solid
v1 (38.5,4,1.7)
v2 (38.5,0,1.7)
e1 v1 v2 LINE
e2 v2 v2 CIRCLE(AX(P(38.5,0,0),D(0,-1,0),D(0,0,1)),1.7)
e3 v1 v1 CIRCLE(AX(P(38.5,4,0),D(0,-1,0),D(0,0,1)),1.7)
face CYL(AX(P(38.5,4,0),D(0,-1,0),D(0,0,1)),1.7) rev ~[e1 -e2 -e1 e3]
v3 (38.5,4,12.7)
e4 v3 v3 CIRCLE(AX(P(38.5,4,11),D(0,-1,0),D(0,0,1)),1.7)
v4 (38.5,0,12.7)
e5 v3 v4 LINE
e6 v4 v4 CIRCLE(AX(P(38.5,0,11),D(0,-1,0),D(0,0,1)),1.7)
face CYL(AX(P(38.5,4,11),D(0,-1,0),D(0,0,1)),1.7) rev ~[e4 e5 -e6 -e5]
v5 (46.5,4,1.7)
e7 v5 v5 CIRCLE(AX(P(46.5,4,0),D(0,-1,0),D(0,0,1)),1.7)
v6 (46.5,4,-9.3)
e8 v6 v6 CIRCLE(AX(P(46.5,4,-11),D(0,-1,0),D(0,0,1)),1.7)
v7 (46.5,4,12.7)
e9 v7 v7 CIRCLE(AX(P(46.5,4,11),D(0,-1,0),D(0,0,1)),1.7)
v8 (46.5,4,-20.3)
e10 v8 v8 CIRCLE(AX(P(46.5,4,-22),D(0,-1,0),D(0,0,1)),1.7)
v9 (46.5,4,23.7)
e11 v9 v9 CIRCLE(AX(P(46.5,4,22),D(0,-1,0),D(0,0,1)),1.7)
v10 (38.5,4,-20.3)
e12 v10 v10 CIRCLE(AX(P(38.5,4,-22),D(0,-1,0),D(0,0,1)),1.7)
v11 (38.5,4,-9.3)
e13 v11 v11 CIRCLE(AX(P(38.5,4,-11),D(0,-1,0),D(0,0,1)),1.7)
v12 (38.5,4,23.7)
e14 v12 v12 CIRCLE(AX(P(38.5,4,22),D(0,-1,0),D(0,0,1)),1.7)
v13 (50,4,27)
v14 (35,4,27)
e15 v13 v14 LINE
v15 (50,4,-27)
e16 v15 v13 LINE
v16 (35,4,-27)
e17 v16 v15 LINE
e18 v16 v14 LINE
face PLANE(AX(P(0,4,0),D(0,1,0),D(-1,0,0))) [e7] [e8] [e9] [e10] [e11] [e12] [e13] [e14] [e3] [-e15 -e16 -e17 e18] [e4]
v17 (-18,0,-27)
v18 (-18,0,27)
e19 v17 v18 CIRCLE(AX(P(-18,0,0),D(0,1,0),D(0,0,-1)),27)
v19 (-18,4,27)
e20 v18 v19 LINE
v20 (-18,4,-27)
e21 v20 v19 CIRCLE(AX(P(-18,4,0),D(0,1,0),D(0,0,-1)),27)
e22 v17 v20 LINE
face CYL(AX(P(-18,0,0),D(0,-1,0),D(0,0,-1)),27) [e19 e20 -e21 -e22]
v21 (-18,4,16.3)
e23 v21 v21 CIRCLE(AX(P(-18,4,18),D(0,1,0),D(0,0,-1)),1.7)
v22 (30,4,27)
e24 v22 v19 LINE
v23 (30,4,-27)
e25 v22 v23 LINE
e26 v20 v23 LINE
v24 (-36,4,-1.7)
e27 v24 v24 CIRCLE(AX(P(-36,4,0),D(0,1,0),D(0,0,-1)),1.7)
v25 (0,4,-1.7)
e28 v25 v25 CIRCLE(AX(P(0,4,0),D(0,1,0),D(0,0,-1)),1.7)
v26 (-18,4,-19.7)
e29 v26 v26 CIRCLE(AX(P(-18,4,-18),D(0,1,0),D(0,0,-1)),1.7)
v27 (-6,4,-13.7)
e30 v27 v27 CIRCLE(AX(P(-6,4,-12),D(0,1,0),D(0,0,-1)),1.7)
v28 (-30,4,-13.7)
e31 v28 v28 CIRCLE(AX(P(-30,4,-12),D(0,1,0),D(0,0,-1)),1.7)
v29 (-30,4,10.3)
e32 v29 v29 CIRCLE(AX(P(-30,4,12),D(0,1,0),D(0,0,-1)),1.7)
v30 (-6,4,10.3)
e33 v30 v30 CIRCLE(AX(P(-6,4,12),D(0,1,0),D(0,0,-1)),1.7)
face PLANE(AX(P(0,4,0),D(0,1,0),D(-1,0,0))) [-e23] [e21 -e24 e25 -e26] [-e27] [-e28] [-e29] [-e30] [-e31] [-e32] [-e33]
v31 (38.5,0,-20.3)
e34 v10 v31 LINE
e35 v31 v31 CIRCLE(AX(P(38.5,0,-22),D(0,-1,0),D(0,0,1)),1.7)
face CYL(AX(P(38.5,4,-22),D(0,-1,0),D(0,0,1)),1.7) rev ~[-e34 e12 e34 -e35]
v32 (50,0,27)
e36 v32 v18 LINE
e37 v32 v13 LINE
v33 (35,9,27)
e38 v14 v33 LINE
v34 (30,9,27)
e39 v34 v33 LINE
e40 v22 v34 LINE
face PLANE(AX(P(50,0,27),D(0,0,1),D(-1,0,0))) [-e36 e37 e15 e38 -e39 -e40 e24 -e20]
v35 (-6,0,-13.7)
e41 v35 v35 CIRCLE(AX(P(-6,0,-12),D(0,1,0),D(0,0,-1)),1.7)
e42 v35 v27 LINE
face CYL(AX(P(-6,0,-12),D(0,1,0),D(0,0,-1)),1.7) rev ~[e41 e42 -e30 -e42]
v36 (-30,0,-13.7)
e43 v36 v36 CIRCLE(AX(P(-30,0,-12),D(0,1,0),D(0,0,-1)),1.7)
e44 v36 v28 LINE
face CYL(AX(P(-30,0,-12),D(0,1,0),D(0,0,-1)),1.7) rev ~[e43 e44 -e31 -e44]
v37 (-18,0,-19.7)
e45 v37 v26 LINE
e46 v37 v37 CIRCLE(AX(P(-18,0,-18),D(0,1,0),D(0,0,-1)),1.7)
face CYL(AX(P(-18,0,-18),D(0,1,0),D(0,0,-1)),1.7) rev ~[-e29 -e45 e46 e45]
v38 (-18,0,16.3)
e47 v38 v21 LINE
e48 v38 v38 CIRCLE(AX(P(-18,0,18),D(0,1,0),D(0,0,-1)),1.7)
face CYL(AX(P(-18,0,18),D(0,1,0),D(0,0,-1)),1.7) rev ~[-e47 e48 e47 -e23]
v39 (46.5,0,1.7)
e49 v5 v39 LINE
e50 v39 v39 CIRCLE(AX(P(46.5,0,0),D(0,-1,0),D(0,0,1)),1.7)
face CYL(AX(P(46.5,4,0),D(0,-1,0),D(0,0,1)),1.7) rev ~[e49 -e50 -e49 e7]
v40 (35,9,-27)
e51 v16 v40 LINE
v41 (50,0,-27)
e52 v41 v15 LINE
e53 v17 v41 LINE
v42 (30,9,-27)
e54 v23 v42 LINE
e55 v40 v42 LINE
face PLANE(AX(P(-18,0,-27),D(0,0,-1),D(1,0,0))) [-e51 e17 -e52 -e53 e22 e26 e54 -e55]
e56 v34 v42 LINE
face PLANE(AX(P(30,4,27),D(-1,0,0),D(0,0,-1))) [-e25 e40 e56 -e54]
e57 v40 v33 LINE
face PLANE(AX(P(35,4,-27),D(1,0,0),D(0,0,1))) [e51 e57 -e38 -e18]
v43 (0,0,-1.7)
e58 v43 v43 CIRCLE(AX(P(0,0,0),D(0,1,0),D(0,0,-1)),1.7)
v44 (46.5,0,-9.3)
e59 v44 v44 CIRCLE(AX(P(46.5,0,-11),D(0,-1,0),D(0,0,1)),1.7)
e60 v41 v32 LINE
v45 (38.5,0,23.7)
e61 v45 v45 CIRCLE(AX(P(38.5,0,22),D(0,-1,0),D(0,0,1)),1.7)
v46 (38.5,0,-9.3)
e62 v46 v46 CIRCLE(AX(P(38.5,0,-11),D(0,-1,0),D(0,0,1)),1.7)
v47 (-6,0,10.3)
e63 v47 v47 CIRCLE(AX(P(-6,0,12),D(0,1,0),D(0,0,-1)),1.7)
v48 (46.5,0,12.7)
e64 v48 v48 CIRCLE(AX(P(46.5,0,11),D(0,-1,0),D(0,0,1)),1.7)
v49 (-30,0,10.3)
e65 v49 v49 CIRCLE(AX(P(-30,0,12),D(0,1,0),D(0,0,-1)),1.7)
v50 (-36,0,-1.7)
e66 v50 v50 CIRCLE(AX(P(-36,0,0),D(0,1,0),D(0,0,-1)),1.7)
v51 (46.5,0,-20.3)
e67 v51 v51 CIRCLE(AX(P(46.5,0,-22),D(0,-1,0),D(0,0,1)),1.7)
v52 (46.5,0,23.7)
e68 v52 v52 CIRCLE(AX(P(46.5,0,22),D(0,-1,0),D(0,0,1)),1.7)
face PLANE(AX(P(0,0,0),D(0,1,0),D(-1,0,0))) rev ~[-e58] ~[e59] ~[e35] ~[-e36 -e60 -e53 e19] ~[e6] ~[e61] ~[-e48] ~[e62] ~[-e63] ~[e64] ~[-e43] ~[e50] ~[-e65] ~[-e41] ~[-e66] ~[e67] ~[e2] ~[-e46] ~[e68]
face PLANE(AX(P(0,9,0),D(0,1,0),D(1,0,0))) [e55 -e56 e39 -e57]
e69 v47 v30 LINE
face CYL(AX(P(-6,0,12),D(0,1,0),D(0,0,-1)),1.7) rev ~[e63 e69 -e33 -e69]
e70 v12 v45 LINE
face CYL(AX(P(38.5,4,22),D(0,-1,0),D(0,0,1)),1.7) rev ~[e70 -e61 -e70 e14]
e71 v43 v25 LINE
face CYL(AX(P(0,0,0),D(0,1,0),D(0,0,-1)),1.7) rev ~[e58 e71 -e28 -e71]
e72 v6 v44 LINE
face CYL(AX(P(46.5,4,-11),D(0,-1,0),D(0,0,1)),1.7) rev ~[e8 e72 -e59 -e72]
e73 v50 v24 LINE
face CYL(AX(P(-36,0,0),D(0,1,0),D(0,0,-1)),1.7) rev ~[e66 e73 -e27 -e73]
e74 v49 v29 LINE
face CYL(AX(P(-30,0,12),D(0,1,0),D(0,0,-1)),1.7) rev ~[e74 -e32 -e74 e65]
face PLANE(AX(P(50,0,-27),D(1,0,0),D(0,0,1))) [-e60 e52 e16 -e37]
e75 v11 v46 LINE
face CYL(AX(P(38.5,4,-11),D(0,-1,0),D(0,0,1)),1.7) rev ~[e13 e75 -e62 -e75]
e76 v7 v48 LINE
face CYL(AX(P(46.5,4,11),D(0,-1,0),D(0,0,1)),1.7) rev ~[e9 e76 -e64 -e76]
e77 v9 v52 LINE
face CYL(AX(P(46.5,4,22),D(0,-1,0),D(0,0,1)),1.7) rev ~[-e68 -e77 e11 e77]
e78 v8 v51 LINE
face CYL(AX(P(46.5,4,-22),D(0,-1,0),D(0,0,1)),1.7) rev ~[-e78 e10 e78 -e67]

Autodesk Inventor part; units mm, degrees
ref_plane "YZ Plane" through (0, 0, 0) normal (1, 0, 0) x (0, 1, 0)
ref_plane "XZ Plane" through (0, 0, 0) normal (0, 1, 0) x (-1, 0, 0)
ref_plane "XY Plane" through (0, 0, 0) normal (0, 0, 1) x (1, 0, 0)
sketch "Skizze1" plane through (0, 0, 0) normal (0, 1, 0) x (-1, 0, 0)
  line L0 (-50, 27) -> (50, 27)
  line L1 (50, 27) -> (50, -27) construction
  line L2 (50, -27) -> (-50, -27)
  line L3 (-50, -27) -> (-50, 27)
  line L4 (-50, 27) -> (50, -27) construction
  line L5 (50, 27) -> (-50, -27) construction
  line L6 (0, 0) -> (66.4326, 0) construction
  arc A0 (18, -27) -> (18, 27) centre (18, 0) ccw
  dimension "d0" = 54
  dimension "d1" = 100
  dimension "d12" = 68
  dimension "d13" = 90
extrude "Extrusion1" add sketch "Skizze1" along normal blind 4
sketch "Skizze5" plane through (0, 4, 0) normal (0, 1, 0) x (1, 0, 0)
  line L0 (-18, -27) -> (50, -27) projected
  line L1 (50, -27) -> (50, 27) projected
  line L2 (50, 27) -> (-18, 27) projected
  arc A0 (-18, 27) -> (-18, -27) centre (-18, 0) ccw projected
  line L3 (35, -27) -> (30, -27)
  line L4 (30, -27) -> (30, 27)
  line L5 (30, 27) -> (35, 27)
  line L6 (35, 27) -> (35, -27)
  point P0 (0, 0)
  dimension "d14" = 15
  dimension "d15" = 5
extrude "Extrusion4" add sketch "Skizze5" along normal blind 5 contours L4 L2 L6 L0
sketch "Skizze6" plane through (0, 4, 0) normal (0, 1, 0) x (1, 0, 0)
  line L0 (35, 27) -> (35, -27) projected
  line L1 (35, -27) -> (50, -27) projected
  line L2 (50, -27) -> (50, 27) projected
  line L3 (50, 27) -> (35, 27) projected
  line L4 (0, 0) -> (67.4565, 0) construction
  point P0 (46.5, 0)
  dimension "d18" = 3.5
hole "Bohrung1" at (46.5, 4, 0) direction (0, -1, 0) diameter 3.4 end through all clearance for "Inbusschraube ISO 4762" size "M3" standard "ISO"
pattern_linear "Rechteckige Anordnung1" count 5 spacing 11 along (0, 0, -1) count 2 spacing 8 along (-1, 0, 0) of "Bohrung1" first direction both ways yes
sketch "Skizze7" plane through (0, 0, 0) normal (0, -1, 0) x (1, 0, 0)
  arc A0 (-18, 27) -> (-18, -27) centre (-18, 0) ccw projected
  line L0 (-6, 12) -> (-30, 12)
  line L1 (-30, 12) -> (-30, -12)
  line L2 (-30, -12) -> (-6, -12)
  line L3 (-6, -12) -> (-6, 12)
  line L4 (-6, 12) -> (-30, -12) construction
  line L5 (-36, 18) -> (0, -18) construction
  circle A1 centre (-18, 0) radius 18
  line L6 (-18, 22.4057) -> (-18, -22.4722) construction
  line L7 (3.1609, 0) -> (-39.488, 0) construction
  point P0 (0, 0)
  point P1 (-18, -18)
  point P2 (-36, 0)
  point P3 (-18, 18)
  point P4 (0, 0)
  dimension "d32" = 24
  dimension "d33" = 24
  dimension "d35" = 36
hole "Bohrung2" at (-18, 0, -18) at (-36, 0, 0) at (-18, 0, 18) at (0, 0, 0) at (-6, 0, -12) at (-30, 0, -12) at (-30, 0, 12) at (-6, 0, 12) direction (0, 1, 0) diameter 3.4 end through all clearance for "Inbusschraube ISO 4762" size "M3" standard "ISO"
properties part number "dynamixel_pro_frame_part3" material "Aluminium 6061"
